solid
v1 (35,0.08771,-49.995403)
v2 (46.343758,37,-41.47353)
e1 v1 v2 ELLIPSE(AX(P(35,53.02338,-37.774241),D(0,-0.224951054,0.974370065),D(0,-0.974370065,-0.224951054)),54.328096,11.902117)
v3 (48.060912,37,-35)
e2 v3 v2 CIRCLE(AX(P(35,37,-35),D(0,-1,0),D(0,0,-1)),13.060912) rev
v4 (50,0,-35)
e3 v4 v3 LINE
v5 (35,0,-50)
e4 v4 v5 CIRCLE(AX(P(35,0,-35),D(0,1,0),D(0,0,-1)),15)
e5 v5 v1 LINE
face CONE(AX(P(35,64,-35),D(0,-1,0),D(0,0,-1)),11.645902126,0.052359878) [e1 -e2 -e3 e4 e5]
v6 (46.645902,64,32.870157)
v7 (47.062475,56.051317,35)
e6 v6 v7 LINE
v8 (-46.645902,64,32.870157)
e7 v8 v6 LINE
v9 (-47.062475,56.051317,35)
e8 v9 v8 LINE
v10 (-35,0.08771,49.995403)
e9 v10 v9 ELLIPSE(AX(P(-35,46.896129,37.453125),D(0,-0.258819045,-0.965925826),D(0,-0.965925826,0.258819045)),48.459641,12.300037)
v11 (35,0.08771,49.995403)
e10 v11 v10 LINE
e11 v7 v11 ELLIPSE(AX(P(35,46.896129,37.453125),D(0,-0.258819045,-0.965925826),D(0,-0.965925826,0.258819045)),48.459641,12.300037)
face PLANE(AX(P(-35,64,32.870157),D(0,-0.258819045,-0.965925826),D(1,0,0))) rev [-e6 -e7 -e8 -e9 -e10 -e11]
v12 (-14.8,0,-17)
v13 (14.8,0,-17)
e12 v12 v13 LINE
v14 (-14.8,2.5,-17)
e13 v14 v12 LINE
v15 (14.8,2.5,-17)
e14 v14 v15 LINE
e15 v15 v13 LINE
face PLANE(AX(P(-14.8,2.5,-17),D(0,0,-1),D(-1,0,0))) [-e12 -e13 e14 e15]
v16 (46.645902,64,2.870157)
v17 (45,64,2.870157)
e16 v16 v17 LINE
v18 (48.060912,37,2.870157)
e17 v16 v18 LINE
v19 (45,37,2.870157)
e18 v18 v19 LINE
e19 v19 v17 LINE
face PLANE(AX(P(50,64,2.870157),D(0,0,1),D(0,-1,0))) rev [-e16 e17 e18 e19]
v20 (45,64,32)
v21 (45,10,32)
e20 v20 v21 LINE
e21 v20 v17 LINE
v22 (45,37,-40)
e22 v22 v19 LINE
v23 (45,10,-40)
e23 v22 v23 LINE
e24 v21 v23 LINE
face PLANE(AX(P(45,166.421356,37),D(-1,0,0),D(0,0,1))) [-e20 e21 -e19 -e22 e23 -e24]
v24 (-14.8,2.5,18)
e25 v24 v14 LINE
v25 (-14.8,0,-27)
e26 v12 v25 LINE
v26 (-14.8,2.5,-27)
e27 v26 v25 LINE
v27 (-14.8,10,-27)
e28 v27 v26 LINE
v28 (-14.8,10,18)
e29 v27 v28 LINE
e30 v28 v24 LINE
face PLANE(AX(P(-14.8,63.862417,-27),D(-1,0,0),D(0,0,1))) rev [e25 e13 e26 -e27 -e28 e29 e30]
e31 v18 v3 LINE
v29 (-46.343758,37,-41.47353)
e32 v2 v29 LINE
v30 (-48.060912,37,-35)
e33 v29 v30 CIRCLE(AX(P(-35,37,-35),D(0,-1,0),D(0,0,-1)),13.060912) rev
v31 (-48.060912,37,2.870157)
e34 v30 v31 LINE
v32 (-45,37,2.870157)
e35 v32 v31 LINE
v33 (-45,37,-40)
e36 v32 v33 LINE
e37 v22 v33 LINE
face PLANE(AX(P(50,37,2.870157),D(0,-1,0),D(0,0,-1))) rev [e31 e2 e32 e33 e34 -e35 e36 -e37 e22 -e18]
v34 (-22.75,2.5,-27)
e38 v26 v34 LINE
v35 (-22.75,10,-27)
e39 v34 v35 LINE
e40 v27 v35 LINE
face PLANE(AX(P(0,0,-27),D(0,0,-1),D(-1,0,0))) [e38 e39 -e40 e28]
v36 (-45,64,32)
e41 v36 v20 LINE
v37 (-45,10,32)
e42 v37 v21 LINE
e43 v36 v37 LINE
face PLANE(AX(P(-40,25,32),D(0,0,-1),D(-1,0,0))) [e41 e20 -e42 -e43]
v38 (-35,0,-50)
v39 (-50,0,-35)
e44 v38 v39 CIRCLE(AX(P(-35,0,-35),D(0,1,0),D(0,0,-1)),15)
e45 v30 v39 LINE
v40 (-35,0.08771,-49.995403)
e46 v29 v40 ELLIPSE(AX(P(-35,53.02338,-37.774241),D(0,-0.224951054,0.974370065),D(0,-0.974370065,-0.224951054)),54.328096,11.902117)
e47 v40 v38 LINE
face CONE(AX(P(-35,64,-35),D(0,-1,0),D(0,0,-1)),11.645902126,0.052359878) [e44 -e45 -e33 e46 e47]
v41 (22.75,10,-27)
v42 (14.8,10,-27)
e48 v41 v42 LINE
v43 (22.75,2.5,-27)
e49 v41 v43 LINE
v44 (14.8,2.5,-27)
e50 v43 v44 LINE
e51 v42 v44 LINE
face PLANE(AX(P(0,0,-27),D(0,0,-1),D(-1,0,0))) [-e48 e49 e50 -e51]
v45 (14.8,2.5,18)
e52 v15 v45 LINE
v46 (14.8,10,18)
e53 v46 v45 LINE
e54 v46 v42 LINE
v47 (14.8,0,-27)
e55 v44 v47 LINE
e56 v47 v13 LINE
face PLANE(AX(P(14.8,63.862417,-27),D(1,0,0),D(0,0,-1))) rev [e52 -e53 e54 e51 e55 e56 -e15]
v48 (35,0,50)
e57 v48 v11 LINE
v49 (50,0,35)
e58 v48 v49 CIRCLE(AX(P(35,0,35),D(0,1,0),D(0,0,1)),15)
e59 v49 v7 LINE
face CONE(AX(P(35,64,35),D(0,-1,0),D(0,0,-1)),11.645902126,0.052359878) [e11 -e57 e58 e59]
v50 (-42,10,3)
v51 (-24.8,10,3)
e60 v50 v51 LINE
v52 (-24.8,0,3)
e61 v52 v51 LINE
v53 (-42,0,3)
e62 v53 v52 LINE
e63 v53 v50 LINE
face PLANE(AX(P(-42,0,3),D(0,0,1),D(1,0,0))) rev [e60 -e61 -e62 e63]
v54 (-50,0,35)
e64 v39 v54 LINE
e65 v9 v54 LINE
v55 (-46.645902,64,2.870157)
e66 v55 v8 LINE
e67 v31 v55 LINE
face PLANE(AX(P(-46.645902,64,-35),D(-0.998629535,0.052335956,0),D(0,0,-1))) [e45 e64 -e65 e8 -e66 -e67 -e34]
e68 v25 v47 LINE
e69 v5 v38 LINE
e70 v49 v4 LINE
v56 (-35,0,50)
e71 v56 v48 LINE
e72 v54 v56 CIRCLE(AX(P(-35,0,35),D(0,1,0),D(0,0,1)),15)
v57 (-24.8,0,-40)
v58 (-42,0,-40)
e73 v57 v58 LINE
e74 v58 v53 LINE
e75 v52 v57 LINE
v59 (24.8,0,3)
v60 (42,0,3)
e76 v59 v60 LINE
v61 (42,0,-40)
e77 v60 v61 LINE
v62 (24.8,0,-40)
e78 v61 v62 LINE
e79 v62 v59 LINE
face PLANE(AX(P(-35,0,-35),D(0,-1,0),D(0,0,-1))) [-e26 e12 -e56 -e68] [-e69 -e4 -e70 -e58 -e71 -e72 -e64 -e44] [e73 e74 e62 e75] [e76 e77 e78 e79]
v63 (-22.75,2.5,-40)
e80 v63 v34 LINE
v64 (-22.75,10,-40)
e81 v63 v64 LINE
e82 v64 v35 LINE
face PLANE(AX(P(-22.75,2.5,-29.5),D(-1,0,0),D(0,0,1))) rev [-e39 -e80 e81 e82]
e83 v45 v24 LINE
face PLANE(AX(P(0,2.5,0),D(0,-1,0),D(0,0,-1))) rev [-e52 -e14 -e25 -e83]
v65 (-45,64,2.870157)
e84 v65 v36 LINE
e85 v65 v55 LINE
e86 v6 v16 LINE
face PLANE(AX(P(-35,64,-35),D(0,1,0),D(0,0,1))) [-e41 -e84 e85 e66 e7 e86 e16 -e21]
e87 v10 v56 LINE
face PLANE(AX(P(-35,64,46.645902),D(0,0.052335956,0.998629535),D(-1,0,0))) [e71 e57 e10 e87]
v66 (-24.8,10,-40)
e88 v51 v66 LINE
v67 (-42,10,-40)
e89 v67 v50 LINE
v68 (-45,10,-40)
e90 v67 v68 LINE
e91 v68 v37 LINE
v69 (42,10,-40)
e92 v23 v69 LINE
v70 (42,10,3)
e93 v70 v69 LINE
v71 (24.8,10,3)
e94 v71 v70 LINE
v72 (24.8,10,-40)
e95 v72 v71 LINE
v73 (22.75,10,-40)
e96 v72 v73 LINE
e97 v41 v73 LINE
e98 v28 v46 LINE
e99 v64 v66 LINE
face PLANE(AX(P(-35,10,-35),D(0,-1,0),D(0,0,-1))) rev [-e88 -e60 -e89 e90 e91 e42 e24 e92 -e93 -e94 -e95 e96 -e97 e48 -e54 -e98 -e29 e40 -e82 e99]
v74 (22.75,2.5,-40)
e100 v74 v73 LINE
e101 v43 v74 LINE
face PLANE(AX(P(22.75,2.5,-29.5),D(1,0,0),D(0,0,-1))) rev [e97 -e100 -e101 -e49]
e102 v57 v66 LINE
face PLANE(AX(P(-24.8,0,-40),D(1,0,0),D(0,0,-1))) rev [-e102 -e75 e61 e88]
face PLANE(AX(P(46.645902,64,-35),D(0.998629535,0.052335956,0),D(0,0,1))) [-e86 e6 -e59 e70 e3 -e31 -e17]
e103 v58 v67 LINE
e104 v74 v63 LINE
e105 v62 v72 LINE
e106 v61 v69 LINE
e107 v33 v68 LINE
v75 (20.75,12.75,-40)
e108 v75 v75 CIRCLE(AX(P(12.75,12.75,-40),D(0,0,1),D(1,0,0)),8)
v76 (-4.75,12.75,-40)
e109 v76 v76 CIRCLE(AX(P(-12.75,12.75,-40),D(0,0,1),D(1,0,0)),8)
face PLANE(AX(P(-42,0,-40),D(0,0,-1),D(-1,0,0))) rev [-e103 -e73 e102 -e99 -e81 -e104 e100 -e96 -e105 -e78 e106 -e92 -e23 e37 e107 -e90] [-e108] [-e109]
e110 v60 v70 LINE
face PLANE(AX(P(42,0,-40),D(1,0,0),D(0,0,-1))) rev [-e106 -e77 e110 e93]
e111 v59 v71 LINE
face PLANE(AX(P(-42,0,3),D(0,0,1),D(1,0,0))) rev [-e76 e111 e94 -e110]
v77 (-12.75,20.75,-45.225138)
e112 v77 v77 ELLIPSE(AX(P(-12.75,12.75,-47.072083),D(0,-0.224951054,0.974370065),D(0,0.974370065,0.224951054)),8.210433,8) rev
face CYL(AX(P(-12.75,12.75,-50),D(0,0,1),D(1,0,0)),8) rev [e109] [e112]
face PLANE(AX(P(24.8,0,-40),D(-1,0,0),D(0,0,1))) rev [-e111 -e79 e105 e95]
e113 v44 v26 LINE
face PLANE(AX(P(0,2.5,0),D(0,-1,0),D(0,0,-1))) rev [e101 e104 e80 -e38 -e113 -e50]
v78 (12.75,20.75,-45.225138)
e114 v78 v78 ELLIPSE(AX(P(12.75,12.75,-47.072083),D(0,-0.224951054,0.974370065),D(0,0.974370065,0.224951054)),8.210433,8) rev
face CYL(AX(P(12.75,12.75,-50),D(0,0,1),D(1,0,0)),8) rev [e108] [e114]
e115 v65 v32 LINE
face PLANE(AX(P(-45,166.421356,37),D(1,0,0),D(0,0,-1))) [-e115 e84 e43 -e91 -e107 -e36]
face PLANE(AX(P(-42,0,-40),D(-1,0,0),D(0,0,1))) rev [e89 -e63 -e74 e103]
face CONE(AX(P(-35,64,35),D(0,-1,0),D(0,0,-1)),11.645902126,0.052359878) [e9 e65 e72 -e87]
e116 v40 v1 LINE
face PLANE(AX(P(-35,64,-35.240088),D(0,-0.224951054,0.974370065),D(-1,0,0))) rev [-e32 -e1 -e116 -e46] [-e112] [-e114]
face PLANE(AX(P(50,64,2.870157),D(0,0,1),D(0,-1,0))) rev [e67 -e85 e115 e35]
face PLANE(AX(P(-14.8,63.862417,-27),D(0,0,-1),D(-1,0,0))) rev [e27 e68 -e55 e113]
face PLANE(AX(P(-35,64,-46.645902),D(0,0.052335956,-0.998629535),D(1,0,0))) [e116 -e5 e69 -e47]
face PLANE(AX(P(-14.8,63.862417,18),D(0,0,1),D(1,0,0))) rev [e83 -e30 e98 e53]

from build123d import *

# Parameters (mm, degrees)
BOSS_EXTRUDE1_DEPTH     = 10
SKETCH2_W               = 17.2
SKETCH2_H               = 43
CUT_EXTRUDE1_DEPTH      = 72.414284285
SKETCH3_W               = 90
SKETCH3_H               = 34
SKETCH3_W_2             = 80
SKETCH3_H_2             = 24
BOSS_EXTRUDE3_DEPTH     = 15
SKETCH4_W               = 49.6
SKETCH4_H               = 5
BOSS_EXTRUDE4_DEPTH     = 10
SKETCH5_W               = 15
SKETCH5_H               = 22
BOSS_EXTRUDE5_DEPTH     = 5
SKETCH6_W               = 90
SKETCH6_H               = 77
BOSS_EXTRUDE6_DEPTH     = 15
BOSS_EXTRUDE8_DEPTH     = 39
CHAMFER1_SIZE           = 64
CHAMFER1_SIZE_2         = 3.354097874
CHAMFER2_SIZE           = 64
CHAMFER2_SIZE_2         = 11.405813635
CHAMFER3_SIZE           = 64
CHAMFER3_SIZE_2         = 13.775745352
CUT_EXTRUDE3_DEPTH      = 95.500525601
CUT_EXTRUDE3_DEPTH_BACK = 95.500525601
SKETCH10_W              = 50
SKETCH10_H              = 27
SKETCH11_W              = 45.5
SKETCH11_H              = 10.5
CUT_EXTRUDE4_DEPTH      = 7.5
SKETCH14_W              = 2.05
SKETCH14_H              = 10.5
BOSS_EXTRUDE9_DEPTH     = 15
SKETCH15_R              = 8
CUT_EXTRUDE5_DEPTH      = 122.227059686
CUT_EXTRUDE6_DEPTH      = 2.5
CUT_EXTRUDE7_REACH      = 97.373
SKETCH18_W              = 29.6
SKETCH18_H              = 45
CUT_EXTRUDE8_DEPTH      = 15
SKETCH21_W              = 29.6
SKETCH21_H              = 35
BOSS_EXTRUDE10_DEPTH    = 2.5
SKETCH22_W              = 90
SKETCH22_H              = 72
CUT_EXTRUDE9_DEPTH      = 54


with BuildPart() as part:
    # Sketch1 → Boss-Extrude1 (new body)
    with BuildSketch(Plane(origin=(0, 0, 0), x_dir=(1, 0, 0), z_dir=(0, 1, 0))):
        with BuildLine():
            Line((-35, 50), (35, 50))
            ThreePointArc((35, 50), (45.606601718, 45.606601718), (50, 35))
            Line((50, 35), (50, -35))
            ThreePointArc((50, -35), (45.606601718, -45.606601718), (35, -50))
            Line((35, -50), (-35, -50))
            ThreePointArc((-35, -50), (-45.606601718, -45.606601718), (-50, -35))
            Line((-50, -35), (-50, 35))
            ThreePointArc((-50, 35), (-45.606601718, 45.606601718), (-35, 50))
        make_face()
    extrude(amount=BOSS_EXTRUDE1_DEPTH)

    # Sketch2 → Cut-Extrude1 (cut, through all)
    with BuildSketch(Plane(origin=(0, 10, 0), x_dir=(1, 0, 0), z_dir=(0, 1, 0))):
        with Locations((-33.4, 18.5)):
            Rectangle(SKETCH2_W, SKETCH2_H)
        with Locations((33.4, 18.5)):
            Rectangle(SKETCH2_W, SKETCH2_H)
    extrude(amount=-CUT_EXTRUDE1_DEPTH, mode=Mode.SUBTRACT)

    # Sketch3 → Boss-Extrude3 (add)
    with BuildSketch(Plane(origin=(0, 10, 0), x_dir=(1, 0, 0), z_dir=(0, 1, 0))):
        with Locations((0, -20)):
            Rectangle(SKETCH3_W, SKETCH3_H)
        with Locations((0, -20)):
            Rectangle(SKETCH3_W_2, SKETCH3_H_2, mode=Mode.SUBTRACT)
    extrude(amount=BOSS_EXTRUDE3_DEPTH)

    # Sketch4 → Boss-Extrude4 (add)
    with BuildSketch(Plane(origin=(0, 10, 0), x_dir=(1, 0, 0), z_dir=(0, 1, 0))):
        with Locations((0, 10)):
            Rectangle(SKETCH4_W, SKETCH4_H)
        with Locations((0, 27)):
            Rectangle(SKETCH4_W, SKETCH4_H)
    extrude(amount=BOSS_EXTRUDE4_DEPTH)

    # Sketch5 → Boss-Extrude5 (add)
    with BuildSketch(Plane(origin=(0, 20, 0), x_dir=(1, 0, 0), z_dir=(0, 1, 0))):
        with Locations((-17.3, 18.5)):
            Rectangle(SKETCH5_W, SKETCH5_H)
        with Locations((17.3, 18.5)):
            Rectangle(SKETCH5_W, SKETCH5_H)
    extrude(amount=BOSS_EXTRUDE5_DEPTH)

    # Sketch6 → Boss-Extrude6 (add)
    with BuildSketch(Plane(origin=(0, 10, 0), x_dir=(1, 0, 0), z_dir=(0, 1, 0))):
        with BuildLine():
            Line((-50, 35), (-50, -35))
            ThreePointArc((-50, -35), (-45.606601718, -45.606601718), (-35, -50))
            Line((-35, -50), (35, -50))
            ThreePointArc((35, -50), (45.606601718, -45.606601718), (50, -35))
            Line((50, -35), (50, 35))
            ThreePointArc((50, 35), (45.606601718, 45.606601718), (35, 50))
            Line((35, 50), (-35, 50))
            ThreePointArc((-35, 50), (-45.606601718, 45.606601718), (-50, 35))
        make_face()
        with Locations((0, 1.5)):
            Rectangle(SKETCH6_W, SKETCH6_H, mode=Mode.SUBTRACT)
    extrude(amount=BOSS_EXTRUDE6_DEPTH)

    # Sketch9 → Boss-Extrude8 (add)
    with BuildSketch(Plane(origin=(0, 25, 0), x_dir=(1, 0, 0), z_dir=(0, 1, 0))):
        with BuildLine():
            Line((-50, 35), (-50, -35))
            ThreePointArc((-50, -35), (-45.606601718, -45.606601718), (-35, -50))
            Line((-35, -50), (35, -50))
            ThreePointArc((35, -50), (45.606601718, -45.606601718), (50, -35))
            Line((50, -35), (50, 35))
            ThreePointArc((50, 35), (45.606601718, 45.606601718), (35, 50))
            Line((35, 50), (-35, 50))
            ThreePointArc((-35, 50), (-45.606601718, 45.606601718), (-50, 35))
        make_face()
        with BuildLine():
            Line((-45, 35), (-45, -32))
            Line((-45, -32), (45, -32))
            Line((45, -32), (45, 35))
            ThreePointArc((45, 35), (44.659258263, 37.588190451), (43.660254038, 40))
            Line((43.660254038, 40), (-43.660254038, 40))
            ThreePointArc((-43.660254038, 40), (-44.659258263, 37.588190451), (-45, 35))
        make_face(mode=Mode.SUBTRACT)
    extrude(amount=BOSS_EXTRUDE8_DEPTH)

    # Chamfer1
    # the kernel refuses this chamfer: 64, 3.354097874 mm, written as the material it takes off along each edge
    with BuildSketch(Plane(origin=(-35, 64, 50), x_dir=(0, -0.9999979738662979, 0.002013023422382214), z_dir=(1, 0, 0)), Plane(origin=(50, 64, 35), x_dir=(0.002013023422382214, -0.9999979738662979, 0), z_dir=(0, 0, -1)), Plane(origin=(-50, 64, -35), x_dir=(-0.002013023422382214, -0.9999979738662979, 0), z_dir=(0, 0, 1)), Plane(origin=(35, 64, -50), x_dir=(0, -0.9999979738662979, -0.002013023422382214), z_dir=(-1, 0, 0))) as chamfer1_piece_1:
        Polygon((CHAMFER1_SIZE * 0.999997973866, CHAMFER1_SIZE * 0.00201302342238), (-CHAMFER1_SIZE_2 * 0.00201302342245, CHAMFER1_SIZE_2 * 0.9999979739), (0, 0), align=None)
    extrude(amount=70, mode=Mode.SUBTRACT)
    with BuildSketch(Plane(origin=(35, 64, 35), x_dir=(0, 0, 1), z_dir=(-1, 0, 0))) as chamfer1_piece_2:
        Polygon((15, -CHAMFER1_SIZE), (15 - CHAMFER1_SIZE_2, 0), (15, 0), align=None)
    revolve(axis=Axis((35, 64, 35), (0, 1, 0)), revolution_arc=90, mode=Mode.SUBTRACT)
    with BuildSketch(Plane(origin=(-35, 64, 35), x_dir=(-1, 0, 0), z_dir=(0, 0, -1))) as chamfer1_piece_3:
        Polygon((15, -CHAMFER1_SIZE), (15 - CHAMFER1_SIZE_2, 0), (15, 0), align=None)
    revolve(axis=Axis((-35, 64, 35), (0, 1, 0)), revolution_arc=90, mode=Mode.SUBTRACT)
    with BuildSketch(Plane(origin=(35, 64, -35), x_dir=(1, 0, 0), z_dir=(0, 0, 1))) as chamfer1_piece_4:
        Polygon((15, -CHAMFER1_SIZE), (15 - CHAMFER1_SIZE_2, 0), (15, 0), align=None)
    revolve(axis=Axis((35, 64, -35), (0, 1, 0)), revolution_arc=90, mode=Mode.SUBTRACT)
    with BuildSketch(Plane(origin=(-35, 64, -35), x_dir=(0, 0, -1), z_dir=(1, 0, 0))) as chamfer1_piece_5:
        Polygon((15 - CHAMFER1_SIZE_2, 0), (15, -CHAMFER1_SIZE), (15, 0), align=None)
    revolve(axis=Axis((-35, 64, -35), (0, 1, 0)), revolution_arc=90, mode=Mode.SUBTRACT)

    # Chamfer2
    # the kernel refuses this chamfer: 64, 11.405813635 mm, written as the material it takes off along each edge
    with BuildSketch(Plane(origin=(201.306482971, 64, -46.645902126), x_dir=(0, -0.9982575003065525, -0.05900816114499234), z_dir=(-1, 0, 0))) as chamfer2_piece_1:
        Polygon((CHAMFER2_SIZE * 0.999977671636, CHAMFER2_SIZE * 0.0066825316561), (-CHAMFER2_SIZE_2 * 0.0590081611462, CHAMFER2_SIZE_2 * 0.998257500326), (0, 0), align=None)
    extrude(amount=402.612965942, mode=Mode.SUBTRACT)

    # Chamfer3
    # the kernel refuses this chamfer: 64, 13.775745352 mm, written as the material it takes off along each edge
    with BuildSketch(Plane(origin=(-201.265469314, 64, 46.645902126), x_dir=(0, -0.9981787050157903, 0.06032638604292662), z_dir=(1, 0, 0))) as chamfer3_piece_1:
        Polygon((CHAMFER3_SIZE * 0.999967974892, CHAMFER3_SIZE * 0.00800307379952), (-CHAMFER3_SIZE_2 * 0.060326386045, CHAMFER3_SIZE_2 * 0.99817870505), (0, 0), align=None)
    extrude(amount=402.530938629, mode=Mode.SUBTRACT)

    # Sketch10 → Cut-Extrude3 (cut, two sides: drawn at the far end of the back side and taken through both)
    with BuildSketch(Plane(origin=(0, 1.307501734, 0), x_dir=(0, 0, 1), z_dir=(-1, 0, 0)).offset(-CUT_EXTRUDE3_DEPTH_BACK)):
        with Locations((-22.129843227, 49.192498266)):
            Rectangle(SKETCH10_W, SKETCH10_H)
    extrude(amount=CUT_EXTRUDE3_DEPTH + CUT_EXTRUDE3_DEPTH_BACK, mode=Mode.SUBTRACT)

    # Sketch11 → Cut-Extrude4 (cut)
    with BuildSketch(Plane(origin=(0, 10, 0), x_dir=(1, 0, 0), z_dir=(0, 1, 0))):
        with Locations((0, 34.75)):
            Rectangle(SKETCH11_W, SKETCH11_H)
    extrude(amount=-CUT_EXTRUDE4_DEPTH, mode=Mode.SUBTRACT)

    # Sketch14 → Boss-Extrude9 (add)
    with BuildSketch(Plane(origin=(0, 10, 0), x_dir=(1, 0, 0), z_dir=(0, 1, 0))):
        with Locations((-23.775, 34.75)):
            Rectangle(SKETCH14_W, SKETCH14_H)
        with Locations((23.775, 34.75)):
            Rectangle(SKETCH14_W, SKETCH14_H)
    extrude(amount=BOSS_EXTRUDE9_DEPTH)

    # Sketch15 → Cut-Extrude5 (cut, through all)
    with BuildSketch(Plane.XY.offset(-40)):
        with Locations((-12.75, 12.75)):
            Circle(SKETCH15_R)
        with Locations((12.75, 12.75)):
            Circle(SKETCH15_R)
    extrude(amount=-CUT_EXTRUDE5_DEPTH, mode=Mode.SUBTRACT)

    # Sketch17 → Cut-Extrude6 (cut)
    with BuildSketch(Plane(origin=(0, 0, -29.5), x_dir=(-1, 0, 0), z_dir=(0, 0, -1))):
        Polygon((-9.8, 25), (-22.75, 25), (-22.75, 2.5), (22.75, 2.5), (22.75, 25), (9.8, 25), (9.8, 20), (-9.8, 20), align=None)
    extrude(amount=-CUT_EXTRUDE6_DEPTH, mode=Mode.SUBTRACT)

    # Cut-Extrude7: up to this face of the body (flat: up to its plane)
    cut_extrude7_end = Plane(part.part.faces().sort_by_distance((0, 10, -18.5))[0])
    # Sketch18 → Cut-Extrude7 (cut, up to the picked face)
    with BuildSketch(Plane.XZ, mode=Mode.PRIVATE) as cut_extrude7_sk1:
        with Locations((0, -4.5)):
            Rectangle(SKETCH18_W, SKETCH18_H)
    cut_extrude7_tool1 = split(extrude(cut_extrude7_sk1.sketch, amount=-CUT_EXTRUDE7_REACH, mode=Mode.PRIVATE), bisect_by=cut_extrude7_end, keep=Keep.BOTH, mode=Mode.PRIVATE)
    add(cut_extrude7_tool1.solids().sort_by(Axis((0, 0, -4.5), (0, 1, 0)))[0], mode=Mode.SUBTRACT)

    # Sketch20 → Cut-Extrude8 (cut)
    with BuildSketch(Plane.XZ.offset(-25)):
        with BuildLine():
            Line((-45, -35), (-45, -40))
            Line((-45, -40), (-43.660254038, -40))
            ThreePointArc((-43.660254038, -40), (-44.659258263, -37.588190451), (-45, -35))
        make_face()
        with BuildLine():
            Line((45, -40), (45, -35))
            ThreePointArc((45, -35), (44.659258263, -37.588190451), (43.660254038, -40))
            Line((43.660254038, -40), (45, -40))
        make_face()
    extrude(amount=-CUT_EXTRUDE8_DEPTH, mode=Mode.SUBTRACT)

    # Sketch21 → Boss-Extrude10 (add)
    with BuildSketch(Plane.XZ):
        with Locations((0, 0.5)):
            Rectangle(SKETCH21_W, SKETCH21_H)
    extrude(amount=-BOSS_EXTRUDE10_DEPTH)

    # Sketch22 → Cut-Extrude9 (cut)
    with BuildSketch(Plane(origin=(0, 64, 0), x_dir=(1, 0, 0), z_dir=(0, 1, 0))):
        with Locations((0, 4)):
            Rectangle(SKETCH22_W, SKETCH22_H)
    extrude(amount=-CUT_EXTRUDE9_DEPTH, mode=Mode.SUBTRACT)


solid = part.part
